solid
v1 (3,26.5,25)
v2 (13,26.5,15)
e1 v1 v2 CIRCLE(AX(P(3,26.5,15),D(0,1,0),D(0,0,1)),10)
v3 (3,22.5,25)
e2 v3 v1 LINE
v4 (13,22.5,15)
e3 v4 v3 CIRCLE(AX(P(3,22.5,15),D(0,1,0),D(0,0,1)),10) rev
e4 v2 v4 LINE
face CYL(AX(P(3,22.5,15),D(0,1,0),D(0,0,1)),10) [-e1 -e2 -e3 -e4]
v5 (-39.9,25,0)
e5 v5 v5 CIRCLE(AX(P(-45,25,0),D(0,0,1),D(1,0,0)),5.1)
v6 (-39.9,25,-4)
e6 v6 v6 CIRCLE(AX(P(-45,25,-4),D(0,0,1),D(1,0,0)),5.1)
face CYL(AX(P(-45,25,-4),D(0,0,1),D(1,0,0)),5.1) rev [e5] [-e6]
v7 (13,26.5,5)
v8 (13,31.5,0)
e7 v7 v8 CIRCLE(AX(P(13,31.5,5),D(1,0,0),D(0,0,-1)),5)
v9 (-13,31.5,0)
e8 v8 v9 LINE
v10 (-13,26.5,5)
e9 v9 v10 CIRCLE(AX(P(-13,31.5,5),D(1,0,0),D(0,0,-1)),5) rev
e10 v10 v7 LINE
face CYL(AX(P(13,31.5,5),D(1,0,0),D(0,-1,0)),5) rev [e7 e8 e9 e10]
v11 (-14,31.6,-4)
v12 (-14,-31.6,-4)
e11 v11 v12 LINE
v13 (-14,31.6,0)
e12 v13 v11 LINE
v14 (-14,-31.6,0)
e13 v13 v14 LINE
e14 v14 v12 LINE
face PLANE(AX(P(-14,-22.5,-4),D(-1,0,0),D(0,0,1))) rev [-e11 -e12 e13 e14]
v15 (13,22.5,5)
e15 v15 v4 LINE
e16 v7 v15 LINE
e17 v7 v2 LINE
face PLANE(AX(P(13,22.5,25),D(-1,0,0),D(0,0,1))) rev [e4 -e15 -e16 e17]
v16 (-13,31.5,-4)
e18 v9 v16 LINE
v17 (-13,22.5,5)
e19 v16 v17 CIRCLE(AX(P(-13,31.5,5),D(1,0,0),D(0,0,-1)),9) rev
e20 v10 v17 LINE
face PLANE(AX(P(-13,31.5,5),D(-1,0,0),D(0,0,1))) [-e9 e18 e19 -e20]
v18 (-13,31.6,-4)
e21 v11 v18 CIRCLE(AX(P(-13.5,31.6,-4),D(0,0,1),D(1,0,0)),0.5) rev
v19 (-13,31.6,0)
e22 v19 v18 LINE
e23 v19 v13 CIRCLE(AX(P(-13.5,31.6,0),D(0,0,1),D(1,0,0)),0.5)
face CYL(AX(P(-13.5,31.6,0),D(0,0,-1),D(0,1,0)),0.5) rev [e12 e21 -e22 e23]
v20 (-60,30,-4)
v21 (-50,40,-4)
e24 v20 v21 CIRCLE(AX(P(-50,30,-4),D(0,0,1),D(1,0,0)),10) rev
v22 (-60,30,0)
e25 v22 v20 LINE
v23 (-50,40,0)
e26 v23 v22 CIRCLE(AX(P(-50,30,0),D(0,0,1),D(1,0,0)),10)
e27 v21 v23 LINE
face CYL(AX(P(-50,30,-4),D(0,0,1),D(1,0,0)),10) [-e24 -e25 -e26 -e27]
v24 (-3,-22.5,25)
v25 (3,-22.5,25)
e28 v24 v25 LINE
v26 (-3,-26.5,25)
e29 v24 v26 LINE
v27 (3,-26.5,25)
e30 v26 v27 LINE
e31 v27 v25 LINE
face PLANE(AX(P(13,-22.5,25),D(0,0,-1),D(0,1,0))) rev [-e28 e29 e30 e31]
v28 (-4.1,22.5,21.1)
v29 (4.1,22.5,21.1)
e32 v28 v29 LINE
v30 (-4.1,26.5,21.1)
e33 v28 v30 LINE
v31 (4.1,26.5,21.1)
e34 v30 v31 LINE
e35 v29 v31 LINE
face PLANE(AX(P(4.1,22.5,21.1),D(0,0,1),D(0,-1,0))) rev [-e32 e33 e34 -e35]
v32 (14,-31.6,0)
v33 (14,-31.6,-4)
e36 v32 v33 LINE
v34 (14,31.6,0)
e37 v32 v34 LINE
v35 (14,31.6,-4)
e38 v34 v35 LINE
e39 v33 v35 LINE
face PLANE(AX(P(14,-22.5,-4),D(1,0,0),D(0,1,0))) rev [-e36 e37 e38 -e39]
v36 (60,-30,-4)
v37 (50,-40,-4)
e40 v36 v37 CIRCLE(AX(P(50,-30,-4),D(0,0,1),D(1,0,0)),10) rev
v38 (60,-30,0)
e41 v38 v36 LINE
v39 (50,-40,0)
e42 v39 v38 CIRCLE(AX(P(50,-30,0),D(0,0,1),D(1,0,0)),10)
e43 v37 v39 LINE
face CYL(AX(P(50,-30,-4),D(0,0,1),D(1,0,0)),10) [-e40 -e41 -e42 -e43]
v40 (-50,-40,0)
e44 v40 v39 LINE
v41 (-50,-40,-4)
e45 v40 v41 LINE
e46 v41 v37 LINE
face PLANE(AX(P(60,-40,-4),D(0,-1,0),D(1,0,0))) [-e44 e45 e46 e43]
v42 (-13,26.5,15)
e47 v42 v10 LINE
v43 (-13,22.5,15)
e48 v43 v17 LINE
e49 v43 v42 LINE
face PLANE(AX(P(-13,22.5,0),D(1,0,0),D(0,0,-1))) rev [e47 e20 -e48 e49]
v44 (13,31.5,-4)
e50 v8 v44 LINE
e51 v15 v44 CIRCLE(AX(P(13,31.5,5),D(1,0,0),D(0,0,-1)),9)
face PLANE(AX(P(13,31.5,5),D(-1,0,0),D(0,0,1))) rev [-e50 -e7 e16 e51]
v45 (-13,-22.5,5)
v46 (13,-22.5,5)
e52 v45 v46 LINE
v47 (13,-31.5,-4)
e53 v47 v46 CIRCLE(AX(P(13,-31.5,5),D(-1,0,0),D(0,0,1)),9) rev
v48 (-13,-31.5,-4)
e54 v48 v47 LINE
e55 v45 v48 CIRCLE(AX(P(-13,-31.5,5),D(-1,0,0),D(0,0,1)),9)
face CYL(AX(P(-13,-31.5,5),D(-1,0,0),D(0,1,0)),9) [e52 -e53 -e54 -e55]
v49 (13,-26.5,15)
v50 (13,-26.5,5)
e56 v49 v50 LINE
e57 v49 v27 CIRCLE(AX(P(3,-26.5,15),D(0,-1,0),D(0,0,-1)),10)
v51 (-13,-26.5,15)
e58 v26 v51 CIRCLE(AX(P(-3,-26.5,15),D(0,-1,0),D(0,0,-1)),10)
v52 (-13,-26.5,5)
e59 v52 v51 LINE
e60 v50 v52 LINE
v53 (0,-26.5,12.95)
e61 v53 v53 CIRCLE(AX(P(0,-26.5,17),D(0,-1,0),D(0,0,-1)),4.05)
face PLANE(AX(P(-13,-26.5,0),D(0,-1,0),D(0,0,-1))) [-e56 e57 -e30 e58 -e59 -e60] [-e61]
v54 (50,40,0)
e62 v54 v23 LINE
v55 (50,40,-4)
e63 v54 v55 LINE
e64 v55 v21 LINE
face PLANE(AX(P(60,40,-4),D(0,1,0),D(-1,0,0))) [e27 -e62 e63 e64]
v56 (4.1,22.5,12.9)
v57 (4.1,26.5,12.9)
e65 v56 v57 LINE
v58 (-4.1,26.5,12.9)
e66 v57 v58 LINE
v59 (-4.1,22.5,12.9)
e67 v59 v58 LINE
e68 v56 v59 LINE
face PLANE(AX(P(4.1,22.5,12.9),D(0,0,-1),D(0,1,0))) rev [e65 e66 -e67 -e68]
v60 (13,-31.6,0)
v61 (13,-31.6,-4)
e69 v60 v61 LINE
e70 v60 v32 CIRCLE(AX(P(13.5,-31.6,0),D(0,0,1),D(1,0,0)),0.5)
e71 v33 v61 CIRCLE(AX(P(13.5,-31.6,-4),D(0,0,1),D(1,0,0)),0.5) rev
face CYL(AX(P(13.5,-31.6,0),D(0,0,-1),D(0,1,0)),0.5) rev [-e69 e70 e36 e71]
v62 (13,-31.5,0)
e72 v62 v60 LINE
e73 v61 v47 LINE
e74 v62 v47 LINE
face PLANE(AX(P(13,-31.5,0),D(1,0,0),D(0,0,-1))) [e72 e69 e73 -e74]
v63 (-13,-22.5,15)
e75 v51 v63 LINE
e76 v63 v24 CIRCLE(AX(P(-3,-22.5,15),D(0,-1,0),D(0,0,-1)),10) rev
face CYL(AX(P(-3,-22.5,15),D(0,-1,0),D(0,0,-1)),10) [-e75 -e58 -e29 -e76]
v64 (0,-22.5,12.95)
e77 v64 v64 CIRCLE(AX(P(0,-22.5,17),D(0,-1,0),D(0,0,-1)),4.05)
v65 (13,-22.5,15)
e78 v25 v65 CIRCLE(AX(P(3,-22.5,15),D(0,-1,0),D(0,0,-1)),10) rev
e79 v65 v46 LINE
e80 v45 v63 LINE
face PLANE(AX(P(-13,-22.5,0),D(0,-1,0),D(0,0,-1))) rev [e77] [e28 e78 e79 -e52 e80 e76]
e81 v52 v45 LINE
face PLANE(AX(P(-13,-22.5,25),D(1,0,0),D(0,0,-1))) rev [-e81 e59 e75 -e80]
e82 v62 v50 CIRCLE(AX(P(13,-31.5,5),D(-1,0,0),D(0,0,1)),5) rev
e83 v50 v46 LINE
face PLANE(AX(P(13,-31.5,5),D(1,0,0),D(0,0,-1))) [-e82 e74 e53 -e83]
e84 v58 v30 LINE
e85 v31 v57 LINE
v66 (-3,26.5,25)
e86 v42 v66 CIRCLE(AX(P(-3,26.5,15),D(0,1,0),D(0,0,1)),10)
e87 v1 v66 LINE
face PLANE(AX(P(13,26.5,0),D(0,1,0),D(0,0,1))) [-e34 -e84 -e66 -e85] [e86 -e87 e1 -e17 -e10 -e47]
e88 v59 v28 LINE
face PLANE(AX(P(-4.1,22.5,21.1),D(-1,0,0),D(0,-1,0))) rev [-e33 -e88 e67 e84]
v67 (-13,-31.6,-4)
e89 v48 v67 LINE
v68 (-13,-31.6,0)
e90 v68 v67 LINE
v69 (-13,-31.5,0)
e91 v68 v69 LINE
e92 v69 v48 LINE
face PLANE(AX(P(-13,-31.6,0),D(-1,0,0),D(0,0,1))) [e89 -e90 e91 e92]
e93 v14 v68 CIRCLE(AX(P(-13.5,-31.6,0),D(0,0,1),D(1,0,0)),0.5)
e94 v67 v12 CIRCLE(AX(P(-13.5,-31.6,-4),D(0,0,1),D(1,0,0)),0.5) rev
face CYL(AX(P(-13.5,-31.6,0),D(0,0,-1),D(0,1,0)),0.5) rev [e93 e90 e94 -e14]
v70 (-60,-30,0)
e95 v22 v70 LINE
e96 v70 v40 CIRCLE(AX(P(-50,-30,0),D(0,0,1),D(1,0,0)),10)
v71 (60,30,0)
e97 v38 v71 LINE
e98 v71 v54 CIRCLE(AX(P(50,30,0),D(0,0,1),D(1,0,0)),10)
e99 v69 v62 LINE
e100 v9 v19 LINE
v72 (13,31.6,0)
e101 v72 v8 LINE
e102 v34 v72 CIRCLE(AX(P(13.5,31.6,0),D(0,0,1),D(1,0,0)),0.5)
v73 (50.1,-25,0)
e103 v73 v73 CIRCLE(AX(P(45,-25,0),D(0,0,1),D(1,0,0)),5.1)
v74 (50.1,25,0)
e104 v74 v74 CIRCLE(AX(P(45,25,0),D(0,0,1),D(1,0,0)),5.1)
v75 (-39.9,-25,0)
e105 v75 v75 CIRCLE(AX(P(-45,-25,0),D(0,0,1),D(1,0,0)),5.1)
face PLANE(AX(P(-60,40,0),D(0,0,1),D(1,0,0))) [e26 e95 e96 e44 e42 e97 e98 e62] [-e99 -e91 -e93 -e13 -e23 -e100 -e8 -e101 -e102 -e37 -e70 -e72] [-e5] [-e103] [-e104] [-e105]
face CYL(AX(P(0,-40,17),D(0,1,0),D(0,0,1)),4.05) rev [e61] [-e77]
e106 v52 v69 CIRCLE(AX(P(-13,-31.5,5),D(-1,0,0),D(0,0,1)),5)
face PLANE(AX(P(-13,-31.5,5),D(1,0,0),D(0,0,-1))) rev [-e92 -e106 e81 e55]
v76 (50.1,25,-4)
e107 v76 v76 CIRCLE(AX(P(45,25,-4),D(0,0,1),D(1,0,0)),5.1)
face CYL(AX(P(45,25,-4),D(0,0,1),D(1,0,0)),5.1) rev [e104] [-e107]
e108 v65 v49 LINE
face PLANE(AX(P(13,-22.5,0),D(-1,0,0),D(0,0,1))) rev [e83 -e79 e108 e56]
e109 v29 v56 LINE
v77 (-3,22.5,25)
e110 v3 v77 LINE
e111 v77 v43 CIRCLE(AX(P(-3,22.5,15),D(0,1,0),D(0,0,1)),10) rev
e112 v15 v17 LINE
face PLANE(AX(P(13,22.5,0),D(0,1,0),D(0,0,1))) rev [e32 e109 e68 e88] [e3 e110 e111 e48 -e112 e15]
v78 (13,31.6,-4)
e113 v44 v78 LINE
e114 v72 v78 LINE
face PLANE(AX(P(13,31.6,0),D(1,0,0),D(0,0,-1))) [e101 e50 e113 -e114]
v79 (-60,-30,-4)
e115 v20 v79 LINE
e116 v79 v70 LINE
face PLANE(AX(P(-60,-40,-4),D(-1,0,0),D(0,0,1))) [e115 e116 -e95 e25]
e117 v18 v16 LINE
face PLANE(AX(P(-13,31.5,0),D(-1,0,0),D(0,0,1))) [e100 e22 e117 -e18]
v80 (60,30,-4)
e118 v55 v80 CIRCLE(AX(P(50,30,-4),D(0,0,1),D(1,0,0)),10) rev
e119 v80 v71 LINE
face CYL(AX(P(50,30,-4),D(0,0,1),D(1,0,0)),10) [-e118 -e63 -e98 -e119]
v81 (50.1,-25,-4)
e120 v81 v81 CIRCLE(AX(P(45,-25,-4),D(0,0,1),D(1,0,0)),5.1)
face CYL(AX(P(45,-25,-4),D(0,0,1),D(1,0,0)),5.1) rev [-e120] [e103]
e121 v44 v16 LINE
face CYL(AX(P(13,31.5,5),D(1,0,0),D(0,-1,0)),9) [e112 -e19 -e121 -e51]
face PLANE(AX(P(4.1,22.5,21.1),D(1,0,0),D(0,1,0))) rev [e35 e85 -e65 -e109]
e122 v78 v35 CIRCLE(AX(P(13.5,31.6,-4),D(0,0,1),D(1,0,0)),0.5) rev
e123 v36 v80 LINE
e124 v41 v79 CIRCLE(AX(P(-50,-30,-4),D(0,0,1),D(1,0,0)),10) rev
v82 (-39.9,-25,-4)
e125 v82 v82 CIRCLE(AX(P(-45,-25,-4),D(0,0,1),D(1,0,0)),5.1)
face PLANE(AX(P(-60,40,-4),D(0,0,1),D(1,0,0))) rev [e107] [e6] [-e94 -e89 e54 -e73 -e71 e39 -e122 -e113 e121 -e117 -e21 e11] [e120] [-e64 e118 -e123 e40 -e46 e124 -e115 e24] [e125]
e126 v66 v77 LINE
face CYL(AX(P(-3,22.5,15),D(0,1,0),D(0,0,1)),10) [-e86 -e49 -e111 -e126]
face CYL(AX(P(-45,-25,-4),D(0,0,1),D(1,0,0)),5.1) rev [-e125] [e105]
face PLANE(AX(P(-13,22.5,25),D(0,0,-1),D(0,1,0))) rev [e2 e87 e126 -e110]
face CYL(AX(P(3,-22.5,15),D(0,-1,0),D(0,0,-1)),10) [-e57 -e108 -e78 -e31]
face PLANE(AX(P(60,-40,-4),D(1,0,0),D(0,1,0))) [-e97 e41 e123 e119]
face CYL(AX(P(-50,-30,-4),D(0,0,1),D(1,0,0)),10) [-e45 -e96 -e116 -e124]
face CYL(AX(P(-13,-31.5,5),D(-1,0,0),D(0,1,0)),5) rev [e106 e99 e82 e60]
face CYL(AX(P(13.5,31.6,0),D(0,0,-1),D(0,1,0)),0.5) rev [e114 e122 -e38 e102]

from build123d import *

# Parameters (mm, degrees)
SKETCH_1_W        = 120
SKETCH_1_H        = 80
SKETCH_1_W_2      = 28
SKETCH_1_H_2      = 45
BASE_PLATE_DEPTH  = 4
TABS2_START       = -5
TABS2_DEPTH       = 10
TABS2_2_OUTLINE_W = 26
TABS2_2_OUTLINE_H = 4
TABS2_2_DEPTH     = 1.41096
TABS2_START_2     = 5
TABS2_3_OUTLINE_W = 26
TABS2_3_OUTLINE_H = 4
TABS2_3_DEPTH     = 20
TABS2_START_3     = -13
TABS2_4_DEPTH     = 26
TABS2_5_DEPTH     = 26
HOLES_DEPTH       = 77.321687612
HOLES_DEPTH_BACK  = 77.321687612
SKETCH_10_R       = 4.05
SKETCH_12_W       = 8.2
SKETCH_12_H       = 8.2
HOLE2_DEPTH       = 4
FILLET_2_R        = 10
SKETCH_11_R       = 5.1
MOUNT_HOLES_DEPTH = 4


with BuildPart() as part:
    # Base Plate: sheet metal written as solids
    # Sketch 1 → Base Plate (new body)
    with BuildSketch(Plane.XY):
        Rectangle(SKETCH_1_W, SKETCH_1_H)
        Rectangle(SKETCH_1_W_2, SKETCH_1_H_2, mode=Mode.SUBTRACT)
    extrude(amount=-BASE_PLATE_DEPTH)

    # Tabs2: read off the stored shape, not the designer's step
    # Tabs2 outline → Tabs2 (cut)
    with BuildSketch(Plane.XY.offset(TABS2_START)):
        with BuildLine():
            ThreePointArc((-13, 31.6), (-13.5, 32.1), (-14, 31.6))
            Line((-14, 31.6), (-14, 22.5))
            Line((-14, 22.5), (-13, 22.5))
            Line((-13, 22.5), (-13, 31.6))
        make_face()
        with BuildLine():
            Line((-13, -22.5), (-14, -22.5))
            Line((-14, -22.5), (-14, -31.6))
            ThreePointArc((-14, -31.6), (-13.5, -32.1), (-13, -31.6))
            Line((-13, -31.6), (-13, -22.5))
        make_face()
        with BuildLine():
            Line((13, 31.6), (13, 22.5))
            Line((13, 22.5), (14, 22.5))
            Line((14, 22.5), (14, 31.6))
            ThreePointArc((14, 31.6), (13.5, 32.1), (13, 31.6))
        make_face()
        with BuildLine():
            Line((14, -22.5), (13, -22.5))
            Line((13, -22.5), (13, -31.6))
            ThreePointArc((13, -31.6), (13.5, -32.1), (14, -31.6))
            Line((14, -31.6), (14, -22.5))
        make_face()
    extrude(amount=TABS2_DEPTH, mode=Mode.SUBTRACT)

    # Tabs2 2 outline → Tabs2 2 (cut)
    with BuildSketch(Plane.XY.offset(TABS2_START)):
        with Locations((0, 24.5)):
            Rectangle(TABS2_2_OUTLINE_W, TABS2_2_OUTLINE_H)
        with Locations((0, -24.5)):
            Rectangle(TABS2_2_OUTLINE_W, TABS2_2_OUTLINE_H)
    extrude(amount=TABS2_2_DEPTH, mode=Mode.SUBTRACT)

    # Tabs2 4 outline → Tabs2 4 (cut)
    with BuildSketch(Plane.YZ.offset(TABS2_START_3)):
        with BuildLine():
            ThreePointArc((31.5, -4), (27.257359313, -2.937253933), (24.016685226, 0))
            Line((24.016685226, 0), (22.5, 0))
            Line((22.5, 0), (22.5, -3.58904))
            Line((22.5, -3.58904), (26.5, -3.58904))
            Line((26.5, -3.58904), (26.5, -4))
            Line((26.5, -4), (31.5, -4))
        make_face()
        with BuildLine():
            Line((-22.5, -3.58904), (-22.5, 0))
            Line((-22.5, 0), (-24.016685226, 0))
            ThreePointArc((-24.016685226, 0), (-27.257359313, -2.937253933), (-31.5, -4))
            Line((-31.5, -4), (-26.5, -4))
            Line((-26.5, -4), (-26.5, -3.58904))
            Line((-26.5, -3.58904), (-22.5, -3.58904))
        make_face()
    extrude(amount=TABS2_4_DEPTH, mode=Mode.SUBTRACT)



with BuildPart() as body_2:
    # Tabs2 3 outline → Tabs2 3 (new body)
    with BuildSketch(Plane.XY.offset(TABS2_START_2)):
        with Locations((0, 24.5)):
            Rectangle(TABS2_3_OUTLINE_W, TABS2_3_OUTLINE_H)
        with Locations((0, -24.5)):
            Rectangle(TABS2_3_OUTLINE_W, TABS2_3_OUTLINE_H)
    extrude(amount=TABS2_3_DEPTH)


with BuildPart() as part_1:
    add(part.part)

    add(body_2.part)  # Tabs2 5 merges body 2
    # Tabs2 5 outline → Tabs2 5 (add)
    with BuildSketch(Plane.YZ.offset(TABS2_START_3)):
        with BuildLine():
            Line((26.5, 5), (22.5, 5))
            ThreePointArc((22.5, 5), (22.88751392, 2.38751392), (24.016685226, 0))
            Line((24.016685226, 0), (31.5, 0))
            ThreePointArc((31.5, 0), (27.964466094, 1.464466094), (26.5, 5))
        make_face()
        with BuildLine():
            Line((-31.5, 0), (-24.016685226, 0))
            ThreePointArc((-24.016685226, 0), (-22.88751392, 2.38751392), (-22.5, 5))
            Line((-22.5, 5), (-26.5, 5))
            ThreePointArc((-26.5, 5), (-27.964466094, 1.464466094), (-31.5, 0))
        make_face()
    extrude(amount=TABS2_5_DEPTH)

    # Эскиз10 → Holes (cut, two sides: drawn at the far end of the back side and taken through both)
    with BuildSketch(Plane(origin=(0, 0, 0), x_dir=(1, 0, 0), z_dir=(0, 1, 0)).offset(-HOLES_DEPTH_BACK)):
        with Locations(Location((0, -17, 0), (0, 0, 90))):
            Circle(SKETCH_10_R)
    extrude(amount=HOLES_DEPTH + HOLES_DEPTH_BACK, mode=Mode.SUBTRACT)

    # Эскиз12 → Hole2 (cut)
    with BuildSketch(Plane(origin=(0, 26.5, 0), x_dir=(1, 0, 0), z_dir=(0, 1, 0))):
        with Locations((0, -17)):
            Rectangle(SKETCH_12_W, SKETCH_12_H)
    extrude(amount=-HOLE2_DEPTH, mode=Mode.SUBTRACT)

    # Fillet 2
    fillet_2_edges = [part_1.edges().sort_by_distance(p)[0] for p in [
        (13, -24.5, 25),
        (-13, -24.5, 25),
        (-60, 40, -2),
        (60, 40, -2),
        (60, -40, -2),
        (-60, -40, -2),
        (-13, 24.5, 25),
        (13, 24.5, 25),
    ]]
    fillet(fillet_2_edges, radius=FILLET_2_R)

    # Эскиз11 → Mount Holes (cut)
    with BuildSketch(Plane.XY):
        with Locations((-45, 25)):
            Circle(SKETCH_11_R)
        with Locations((45, 25)):
            Circle(SKETCH_11_R)
        with Locations((-45, -25)):
            Circle(SKETCH_11_R)
        with Locations((45, -25)):
            Circle(SKETCH_11_R)
    extrude(amount=-MOUNT_HOLES_DEPTH, mode=Mode.SUBTRACT)


solid = part_1.part
